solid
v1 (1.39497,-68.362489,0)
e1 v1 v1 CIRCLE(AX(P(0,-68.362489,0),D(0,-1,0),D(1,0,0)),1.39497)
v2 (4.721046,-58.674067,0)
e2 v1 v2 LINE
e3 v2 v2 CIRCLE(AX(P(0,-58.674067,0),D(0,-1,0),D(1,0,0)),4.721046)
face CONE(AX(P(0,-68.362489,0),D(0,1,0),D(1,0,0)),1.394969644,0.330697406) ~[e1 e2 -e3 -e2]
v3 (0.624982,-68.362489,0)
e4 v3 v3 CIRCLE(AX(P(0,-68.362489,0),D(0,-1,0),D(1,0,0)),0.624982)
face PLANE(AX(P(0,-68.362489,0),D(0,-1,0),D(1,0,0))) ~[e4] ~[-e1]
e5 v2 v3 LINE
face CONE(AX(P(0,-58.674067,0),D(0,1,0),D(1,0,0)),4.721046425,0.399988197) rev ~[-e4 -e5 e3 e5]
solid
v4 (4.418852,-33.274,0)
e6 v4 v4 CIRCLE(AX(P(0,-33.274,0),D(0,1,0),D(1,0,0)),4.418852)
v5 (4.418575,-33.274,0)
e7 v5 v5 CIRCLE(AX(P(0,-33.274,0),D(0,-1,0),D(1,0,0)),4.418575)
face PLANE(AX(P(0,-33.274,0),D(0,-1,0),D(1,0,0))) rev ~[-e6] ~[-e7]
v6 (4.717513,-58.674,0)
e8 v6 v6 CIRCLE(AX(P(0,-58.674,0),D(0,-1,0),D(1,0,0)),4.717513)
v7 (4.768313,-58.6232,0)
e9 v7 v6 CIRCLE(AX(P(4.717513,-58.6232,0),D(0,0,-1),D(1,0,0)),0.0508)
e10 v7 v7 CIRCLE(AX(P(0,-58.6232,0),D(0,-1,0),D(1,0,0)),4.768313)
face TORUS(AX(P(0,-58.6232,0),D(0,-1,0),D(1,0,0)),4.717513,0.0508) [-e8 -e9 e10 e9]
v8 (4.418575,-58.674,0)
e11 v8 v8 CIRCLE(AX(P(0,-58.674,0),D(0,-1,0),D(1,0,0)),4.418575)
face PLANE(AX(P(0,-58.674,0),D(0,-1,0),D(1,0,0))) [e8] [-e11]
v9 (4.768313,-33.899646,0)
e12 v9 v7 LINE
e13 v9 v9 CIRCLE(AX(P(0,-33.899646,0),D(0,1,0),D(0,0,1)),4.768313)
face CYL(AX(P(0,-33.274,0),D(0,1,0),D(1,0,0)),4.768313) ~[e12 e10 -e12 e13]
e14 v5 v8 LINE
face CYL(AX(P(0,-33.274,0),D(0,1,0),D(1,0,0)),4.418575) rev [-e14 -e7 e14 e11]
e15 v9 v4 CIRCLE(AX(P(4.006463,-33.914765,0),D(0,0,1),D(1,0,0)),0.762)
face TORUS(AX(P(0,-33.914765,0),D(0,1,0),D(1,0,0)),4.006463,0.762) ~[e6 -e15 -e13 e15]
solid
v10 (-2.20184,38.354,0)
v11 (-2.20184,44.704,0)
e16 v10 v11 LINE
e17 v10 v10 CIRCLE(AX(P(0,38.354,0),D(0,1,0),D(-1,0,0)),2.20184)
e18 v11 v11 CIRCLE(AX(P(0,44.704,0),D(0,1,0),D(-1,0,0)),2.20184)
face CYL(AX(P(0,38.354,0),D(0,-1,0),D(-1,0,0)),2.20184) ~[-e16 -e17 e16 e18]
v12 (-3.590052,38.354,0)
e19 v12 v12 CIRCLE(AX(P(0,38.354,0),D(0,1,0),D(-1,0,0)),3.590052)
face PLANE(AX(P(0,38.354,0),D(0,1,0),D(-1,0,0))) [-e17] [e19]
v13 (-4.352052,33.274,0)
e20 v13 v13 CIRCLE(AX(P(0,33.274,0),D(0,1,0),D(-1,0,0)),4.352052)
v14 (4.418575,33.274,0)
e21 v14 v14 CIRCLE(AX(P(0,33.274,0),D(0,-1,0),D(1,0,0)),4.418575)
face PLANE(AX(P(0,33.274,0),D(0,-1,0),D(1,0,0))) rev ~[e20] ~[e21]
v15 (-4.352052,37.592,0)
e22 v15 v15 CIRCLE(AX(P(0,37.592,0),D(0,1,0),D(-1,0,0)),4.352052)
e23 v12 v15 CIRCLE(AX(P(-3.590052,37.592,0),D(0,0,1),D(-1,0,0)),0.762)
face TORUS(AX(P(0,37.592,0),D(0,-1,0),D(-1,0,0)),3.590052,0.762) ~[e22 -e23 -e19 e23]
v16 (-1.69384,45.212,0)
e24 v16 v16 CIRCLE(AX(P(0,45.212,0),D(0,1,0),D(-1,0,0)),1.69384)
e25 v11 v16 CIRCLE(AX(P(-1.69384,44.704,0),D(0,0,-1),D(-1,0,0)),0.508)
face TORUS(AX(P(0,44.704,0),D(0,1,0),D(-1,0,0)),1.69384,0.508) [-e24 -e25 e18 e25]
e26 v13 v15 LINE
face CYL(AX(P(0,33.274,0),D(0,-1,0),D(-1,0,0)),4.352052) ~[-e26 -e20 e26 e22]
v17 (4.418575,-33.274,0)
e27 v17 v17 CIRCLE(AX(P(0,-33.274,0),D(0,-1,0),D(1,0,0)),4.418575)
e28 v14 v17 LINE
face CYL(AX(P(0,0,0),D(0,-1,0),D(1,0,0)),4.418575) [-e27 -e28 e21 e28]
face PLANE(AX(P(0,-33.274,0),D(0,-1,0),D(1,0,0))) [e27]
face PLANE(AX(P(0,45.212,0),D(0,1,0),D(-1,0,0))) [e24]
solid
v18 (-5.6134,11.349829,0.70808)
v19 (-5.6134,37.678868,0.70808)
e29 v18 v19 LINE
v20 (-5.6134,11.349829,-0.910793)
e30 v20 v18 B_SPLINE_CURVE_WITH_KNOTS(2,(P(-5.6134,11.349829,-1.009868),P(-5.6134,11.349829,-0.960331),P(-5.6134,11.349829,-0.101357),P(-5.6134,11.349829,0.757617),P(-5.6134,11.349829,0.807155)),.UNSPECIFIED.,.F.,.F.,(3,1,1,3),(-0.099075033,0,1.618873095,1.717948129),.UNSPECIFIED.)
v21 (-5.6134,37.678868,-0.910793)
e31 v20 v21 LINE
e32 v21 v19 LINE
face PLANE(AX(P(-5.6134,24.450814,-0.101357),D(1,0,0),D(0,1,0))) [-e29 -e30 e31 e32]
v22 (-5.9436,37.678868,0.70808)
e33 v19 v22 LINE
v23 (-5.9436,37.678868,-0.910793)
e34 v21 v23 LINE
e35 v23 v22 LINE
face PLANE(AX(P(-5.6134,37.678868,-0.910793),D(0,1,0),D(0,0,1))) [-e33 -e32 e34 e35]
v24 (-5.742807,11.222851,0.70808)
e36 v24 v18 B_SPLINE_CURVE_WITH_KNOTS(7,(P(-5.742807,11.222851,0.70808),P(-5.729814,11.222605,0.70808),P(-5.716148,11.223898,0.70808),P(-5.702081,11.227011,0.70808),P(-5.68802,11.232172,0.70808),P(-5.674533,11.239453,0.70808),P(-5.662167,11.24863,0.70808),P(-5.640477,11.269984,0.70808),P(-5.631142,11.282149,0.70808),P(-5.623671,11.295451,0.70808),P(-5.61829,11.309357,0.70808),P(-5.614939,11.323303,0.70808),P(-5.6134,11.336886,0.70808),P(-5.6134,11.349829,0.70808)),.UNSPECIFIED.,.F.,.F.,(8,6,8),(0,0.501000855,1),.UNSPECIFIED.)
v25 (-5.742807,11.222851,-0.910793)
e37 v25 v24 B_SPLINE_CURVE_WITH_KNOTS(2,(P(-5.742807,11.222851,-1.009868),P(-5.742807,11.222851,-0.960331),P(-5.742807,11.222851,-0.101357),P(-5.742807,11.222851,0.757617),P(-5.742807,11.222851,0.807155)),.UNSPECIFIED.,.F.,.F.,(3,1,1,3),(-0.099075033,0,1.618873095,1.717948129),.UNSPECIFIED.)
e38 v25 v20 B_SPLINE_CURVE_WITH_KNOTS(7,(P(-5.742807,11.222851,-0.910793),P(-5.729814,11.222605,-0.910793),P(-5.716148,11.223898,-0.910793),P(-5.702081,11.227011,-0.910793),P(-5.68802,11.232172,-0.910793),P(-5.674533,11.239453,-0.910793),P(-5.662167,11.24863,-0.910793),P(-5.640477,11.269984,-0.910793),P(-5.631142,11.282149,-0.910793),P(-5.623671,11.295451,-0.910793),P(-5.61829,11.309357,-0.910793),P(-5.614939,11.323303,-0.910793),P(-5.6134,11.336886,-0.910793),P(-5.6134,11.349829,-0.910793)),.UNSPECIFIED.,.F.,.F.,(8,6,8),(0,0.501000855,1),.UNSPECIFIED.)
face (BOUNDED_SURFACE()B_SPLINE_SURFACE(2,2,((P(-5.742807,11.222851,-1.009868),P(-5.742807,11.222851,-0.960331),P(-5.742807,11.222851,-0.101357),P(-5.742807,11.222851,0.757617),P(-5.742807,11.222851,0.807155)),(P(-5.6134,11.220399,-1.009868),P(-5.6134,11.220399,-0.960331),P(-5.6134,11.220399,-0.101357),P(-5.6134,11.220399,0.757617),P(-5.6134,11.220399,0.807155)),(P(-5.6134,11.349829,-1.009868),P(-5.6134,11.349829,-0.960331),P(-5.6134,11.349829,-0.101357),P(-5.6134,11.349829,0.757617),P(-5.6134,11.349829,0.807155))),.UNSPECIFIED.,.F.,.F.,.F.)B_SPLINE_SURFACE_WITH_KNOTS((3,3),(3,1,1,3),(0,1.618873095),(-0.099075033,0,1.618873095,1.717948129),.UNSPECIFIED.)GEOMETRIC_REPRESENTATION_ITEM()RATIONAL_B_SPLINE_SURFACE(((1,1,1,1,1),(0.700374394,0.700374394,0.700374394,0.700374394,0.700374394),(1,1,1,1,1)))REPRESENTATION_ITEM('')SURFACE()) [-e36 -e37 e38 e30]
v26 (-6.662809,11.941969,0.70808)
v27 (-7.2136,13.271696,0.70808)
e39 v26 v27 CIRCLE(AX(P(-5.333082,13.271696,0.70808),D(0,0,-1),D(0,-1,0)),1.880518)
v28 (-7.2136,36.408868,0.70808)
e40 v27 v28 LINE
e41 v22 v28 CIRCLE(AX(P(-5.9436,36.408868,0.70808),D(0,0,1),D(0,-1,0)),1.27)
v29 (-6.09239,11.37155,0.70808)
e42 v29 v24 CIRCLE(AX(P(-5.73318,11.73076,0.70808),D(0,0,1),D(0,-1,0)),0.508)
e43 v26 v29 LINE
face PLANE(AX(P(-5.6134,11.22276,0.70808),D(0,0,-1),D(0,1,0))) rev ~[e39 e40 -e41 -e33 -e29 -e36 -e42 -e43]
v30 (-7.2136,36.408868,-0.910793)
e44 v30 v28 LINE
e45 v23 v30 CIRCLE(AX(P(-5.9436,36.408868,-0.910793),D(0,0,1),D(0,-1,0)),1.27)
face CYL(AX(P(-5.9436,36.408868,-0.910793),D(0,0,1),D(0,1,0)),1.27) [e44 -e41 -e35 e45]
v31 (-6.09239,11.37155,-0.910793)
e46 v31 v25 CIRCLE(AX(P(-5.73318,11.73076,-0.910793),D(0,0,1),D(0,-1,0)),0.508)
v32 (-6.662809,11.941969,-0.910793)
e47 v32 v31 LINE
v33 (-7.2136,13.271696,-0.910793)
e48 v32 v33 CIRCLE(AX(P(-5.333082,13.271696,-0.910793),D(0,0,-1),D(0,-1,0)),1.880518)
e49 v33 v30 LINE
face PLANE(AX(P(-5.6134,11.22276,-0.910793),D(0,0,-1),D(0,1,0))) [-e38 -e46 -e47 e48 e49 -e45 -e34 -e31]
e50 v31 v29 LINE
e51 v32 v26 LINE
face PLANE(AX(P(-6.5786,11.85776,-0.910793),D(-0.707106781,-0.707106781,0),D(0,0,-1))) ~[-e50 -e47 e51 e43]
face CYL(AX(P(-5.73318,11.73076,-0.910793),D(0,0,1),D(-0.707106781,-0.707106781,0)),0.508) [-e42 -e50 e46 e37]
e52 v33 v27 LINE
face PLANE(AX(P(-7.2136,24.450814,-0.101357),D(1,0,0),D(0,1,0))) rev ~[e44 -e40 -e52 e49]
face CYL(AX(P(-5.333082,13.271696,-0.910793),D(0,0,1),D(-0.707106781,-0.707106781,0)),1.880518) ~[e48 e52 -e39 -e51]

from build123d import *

# Parameters (mm, degrees)
F0_R      = 4.4185747542
F1_DEPTH  = 33.274
F2_R      = 4.3520524893
F3_DEPTH  = 5.08
F4_R      = 2.2018395717
F5_DEPTH  = 6.858
F6_R      = 4.7683130079
F6_R_2    = 4.4185747542
F7_DEPTH  = 25.4
F12_W     = 26.4561073855
F12_H     = 1.6188730951
F13_DEPTH = 1.6002
F17_R     = 0.0508
F18_R     = 0.508
F19_R     = 0.762
F20_R     = 1.27
F21_SIZE  = 1.27
F22_R     = 0.508
F23_R     = 0.127
F24_R     = 1.8805178093


# Not quite as in the source:
# - a fillet or chamfer that OpenCascade refuses, or shapes differently, is made with other operations: its cross-section is extruded or revolved along the edge and cut away or added
# - the program builds the solid bodies; features that only make, move or delete a surface that nothing else refers to are left out


with BuildPart() as f1:
    # F0 (on Front) → F1 (new body, symmetric)
    with BuildSketch(Plane.XZ):
        Circle(F0_R)
    extrude(amount=F1_DEPTH, both=True)

    # F2 (on face) → F3 (join)
    with BuildSketch(Plane(origin=(0, 33.274, 0), x_dir=(-1, 0, 0), z_dir=(0, 1, 0))):
        Circle(F2_R)
    extrude(amount=F3_DEPTH)

    # F4 (on face) → F5 (join)
    with BuildSketch(Plane(origin=(0, 38.354, 0), x_dir=(-1, 0, 0), z_dir=(0, 1, 0))):
        Circle(F4_R)
    extrude(amount=F5_DEPTH)

    # F18
    f18_edges = [f1.edges().sort_by_distance(p)[0] for p in [
        (2.20184, 45.212, 0),
    ]]
    fillet(f18_edges, radius=F18_R)

    # F19
    f19_edges = [f1.edges().sort_by_distance(p)[0] for p in [
        (4.352052, 38.354, 0),
    ]]
    fillet(f19_edges, radius=F19_R)


with BuildPart() as f7:
    # F6 (on face) → F7 (new body)
    with BuildSketch(Plane.XZ.offset(33.274)):
        Circle(F6_R)
        Circle(F6_R_2, mode=Mode.SUBTRACT)
    extrude(amount=F7_DEPTH)

    # F16: fillet of radius 0.762 on 1 edges, made by hand

    # F16_s1 → F16_t2 (revolve, cut)
    with BuildSketch(Plane.XY):
        with BuildLine():
            ThreePointArc((4.7684630079, -33.9147646456), (4.6753183658, -33.5496940905), (4.4186558946, -33.2738738404))
            Line((4.4186558946, -33.2738738404), (4.4268997523, -33.2610560243))
            ThreePointArc((4.4268997523, -33.2610560243), (4.5934844512, -33.25876), (4.7683130079, -33.25876))
            Line((4.7683130079, -33.25876), (4.7835530079, -33.274))
            ThreePointArc((4.7835530079, -33.274), (4.7835530079, -33.5943823228), (4.7837030079, -33.9147646456))
            Line((4.7837030079, -33.9147646456), (4.7684630079, -33.9147646456))
        make_face()
    revolve(axis=Axis((0, -33.274, 0), (0, -1, 0)), mode=Mode.SUBTRACT)

    # F17
    f17_edges = [f7.edges().sort_by_distance(p)[0] for p in [
        (-4.768313, -58.674, 0),
    ]]
    fillet(f17_edges, radius=F17_R)


with BuildPart() as f13:
    # F12 (on offset) → F13 (new body)
    with BuildSketch(Plane.YZ.offset(-5.6134)):
        with Locations((24.4508138858, -0.1013565925)):
            Rectangle(F12_W, F12_H)
    extrude(amount=-F13_DEPTH)

    # F20
    f20_edges = [f13.edges().sort_by_distance(p)[0] for p in [
        (-7.2136, 37.678868, -0.101357),
    ]]
    fillet(f20_edges, radius=F20_R)

    # F21
    f21_edges = [f13.edges().sort_by_distance(p)[0] for p in [
        (-7.2136, 11.22276, -0.101357),
    ]]
    chamfer(f21_edges, length=F21_SIZE)

    # F22
    f22_edges = [f13.edges().sort_by_distance(p)[0] for p in [
        (-5.9436, 11.22276, -0.101357),
    ]]
    fillet(f22_edges, radius=F22_R)

    # F23
    f23_edges = [f13.edges().sort_by_distance(p)[0] for p in [
        (-5.6134, 11.22276, -0.101357),
    ]]
    fillet(f23_edges, radius=F23_R)

    # F24
    f24_edges = [f13.edges().sort_by_distance(p)[0] for p in [
        (-7.2136, 12.49276, -0.101357),
    ]]
    fillet(f24_edges, radius=F24_R)


with BuildPart() as f15:
    # F14 (on Top) → F15 (revolve)
    with BuildSketch(Plane.XY):
        Polygon((1.394969644, -68.3624893427), (4.7210464254, -58.6740672588), (0.6249820581, -68.3624893427), align=None)
    revolve(axis=Axis((0, -58.674, 0), (0, -1, 0)))


solid = Compound([f1.part, f7.part, f13.part, f15.part])
